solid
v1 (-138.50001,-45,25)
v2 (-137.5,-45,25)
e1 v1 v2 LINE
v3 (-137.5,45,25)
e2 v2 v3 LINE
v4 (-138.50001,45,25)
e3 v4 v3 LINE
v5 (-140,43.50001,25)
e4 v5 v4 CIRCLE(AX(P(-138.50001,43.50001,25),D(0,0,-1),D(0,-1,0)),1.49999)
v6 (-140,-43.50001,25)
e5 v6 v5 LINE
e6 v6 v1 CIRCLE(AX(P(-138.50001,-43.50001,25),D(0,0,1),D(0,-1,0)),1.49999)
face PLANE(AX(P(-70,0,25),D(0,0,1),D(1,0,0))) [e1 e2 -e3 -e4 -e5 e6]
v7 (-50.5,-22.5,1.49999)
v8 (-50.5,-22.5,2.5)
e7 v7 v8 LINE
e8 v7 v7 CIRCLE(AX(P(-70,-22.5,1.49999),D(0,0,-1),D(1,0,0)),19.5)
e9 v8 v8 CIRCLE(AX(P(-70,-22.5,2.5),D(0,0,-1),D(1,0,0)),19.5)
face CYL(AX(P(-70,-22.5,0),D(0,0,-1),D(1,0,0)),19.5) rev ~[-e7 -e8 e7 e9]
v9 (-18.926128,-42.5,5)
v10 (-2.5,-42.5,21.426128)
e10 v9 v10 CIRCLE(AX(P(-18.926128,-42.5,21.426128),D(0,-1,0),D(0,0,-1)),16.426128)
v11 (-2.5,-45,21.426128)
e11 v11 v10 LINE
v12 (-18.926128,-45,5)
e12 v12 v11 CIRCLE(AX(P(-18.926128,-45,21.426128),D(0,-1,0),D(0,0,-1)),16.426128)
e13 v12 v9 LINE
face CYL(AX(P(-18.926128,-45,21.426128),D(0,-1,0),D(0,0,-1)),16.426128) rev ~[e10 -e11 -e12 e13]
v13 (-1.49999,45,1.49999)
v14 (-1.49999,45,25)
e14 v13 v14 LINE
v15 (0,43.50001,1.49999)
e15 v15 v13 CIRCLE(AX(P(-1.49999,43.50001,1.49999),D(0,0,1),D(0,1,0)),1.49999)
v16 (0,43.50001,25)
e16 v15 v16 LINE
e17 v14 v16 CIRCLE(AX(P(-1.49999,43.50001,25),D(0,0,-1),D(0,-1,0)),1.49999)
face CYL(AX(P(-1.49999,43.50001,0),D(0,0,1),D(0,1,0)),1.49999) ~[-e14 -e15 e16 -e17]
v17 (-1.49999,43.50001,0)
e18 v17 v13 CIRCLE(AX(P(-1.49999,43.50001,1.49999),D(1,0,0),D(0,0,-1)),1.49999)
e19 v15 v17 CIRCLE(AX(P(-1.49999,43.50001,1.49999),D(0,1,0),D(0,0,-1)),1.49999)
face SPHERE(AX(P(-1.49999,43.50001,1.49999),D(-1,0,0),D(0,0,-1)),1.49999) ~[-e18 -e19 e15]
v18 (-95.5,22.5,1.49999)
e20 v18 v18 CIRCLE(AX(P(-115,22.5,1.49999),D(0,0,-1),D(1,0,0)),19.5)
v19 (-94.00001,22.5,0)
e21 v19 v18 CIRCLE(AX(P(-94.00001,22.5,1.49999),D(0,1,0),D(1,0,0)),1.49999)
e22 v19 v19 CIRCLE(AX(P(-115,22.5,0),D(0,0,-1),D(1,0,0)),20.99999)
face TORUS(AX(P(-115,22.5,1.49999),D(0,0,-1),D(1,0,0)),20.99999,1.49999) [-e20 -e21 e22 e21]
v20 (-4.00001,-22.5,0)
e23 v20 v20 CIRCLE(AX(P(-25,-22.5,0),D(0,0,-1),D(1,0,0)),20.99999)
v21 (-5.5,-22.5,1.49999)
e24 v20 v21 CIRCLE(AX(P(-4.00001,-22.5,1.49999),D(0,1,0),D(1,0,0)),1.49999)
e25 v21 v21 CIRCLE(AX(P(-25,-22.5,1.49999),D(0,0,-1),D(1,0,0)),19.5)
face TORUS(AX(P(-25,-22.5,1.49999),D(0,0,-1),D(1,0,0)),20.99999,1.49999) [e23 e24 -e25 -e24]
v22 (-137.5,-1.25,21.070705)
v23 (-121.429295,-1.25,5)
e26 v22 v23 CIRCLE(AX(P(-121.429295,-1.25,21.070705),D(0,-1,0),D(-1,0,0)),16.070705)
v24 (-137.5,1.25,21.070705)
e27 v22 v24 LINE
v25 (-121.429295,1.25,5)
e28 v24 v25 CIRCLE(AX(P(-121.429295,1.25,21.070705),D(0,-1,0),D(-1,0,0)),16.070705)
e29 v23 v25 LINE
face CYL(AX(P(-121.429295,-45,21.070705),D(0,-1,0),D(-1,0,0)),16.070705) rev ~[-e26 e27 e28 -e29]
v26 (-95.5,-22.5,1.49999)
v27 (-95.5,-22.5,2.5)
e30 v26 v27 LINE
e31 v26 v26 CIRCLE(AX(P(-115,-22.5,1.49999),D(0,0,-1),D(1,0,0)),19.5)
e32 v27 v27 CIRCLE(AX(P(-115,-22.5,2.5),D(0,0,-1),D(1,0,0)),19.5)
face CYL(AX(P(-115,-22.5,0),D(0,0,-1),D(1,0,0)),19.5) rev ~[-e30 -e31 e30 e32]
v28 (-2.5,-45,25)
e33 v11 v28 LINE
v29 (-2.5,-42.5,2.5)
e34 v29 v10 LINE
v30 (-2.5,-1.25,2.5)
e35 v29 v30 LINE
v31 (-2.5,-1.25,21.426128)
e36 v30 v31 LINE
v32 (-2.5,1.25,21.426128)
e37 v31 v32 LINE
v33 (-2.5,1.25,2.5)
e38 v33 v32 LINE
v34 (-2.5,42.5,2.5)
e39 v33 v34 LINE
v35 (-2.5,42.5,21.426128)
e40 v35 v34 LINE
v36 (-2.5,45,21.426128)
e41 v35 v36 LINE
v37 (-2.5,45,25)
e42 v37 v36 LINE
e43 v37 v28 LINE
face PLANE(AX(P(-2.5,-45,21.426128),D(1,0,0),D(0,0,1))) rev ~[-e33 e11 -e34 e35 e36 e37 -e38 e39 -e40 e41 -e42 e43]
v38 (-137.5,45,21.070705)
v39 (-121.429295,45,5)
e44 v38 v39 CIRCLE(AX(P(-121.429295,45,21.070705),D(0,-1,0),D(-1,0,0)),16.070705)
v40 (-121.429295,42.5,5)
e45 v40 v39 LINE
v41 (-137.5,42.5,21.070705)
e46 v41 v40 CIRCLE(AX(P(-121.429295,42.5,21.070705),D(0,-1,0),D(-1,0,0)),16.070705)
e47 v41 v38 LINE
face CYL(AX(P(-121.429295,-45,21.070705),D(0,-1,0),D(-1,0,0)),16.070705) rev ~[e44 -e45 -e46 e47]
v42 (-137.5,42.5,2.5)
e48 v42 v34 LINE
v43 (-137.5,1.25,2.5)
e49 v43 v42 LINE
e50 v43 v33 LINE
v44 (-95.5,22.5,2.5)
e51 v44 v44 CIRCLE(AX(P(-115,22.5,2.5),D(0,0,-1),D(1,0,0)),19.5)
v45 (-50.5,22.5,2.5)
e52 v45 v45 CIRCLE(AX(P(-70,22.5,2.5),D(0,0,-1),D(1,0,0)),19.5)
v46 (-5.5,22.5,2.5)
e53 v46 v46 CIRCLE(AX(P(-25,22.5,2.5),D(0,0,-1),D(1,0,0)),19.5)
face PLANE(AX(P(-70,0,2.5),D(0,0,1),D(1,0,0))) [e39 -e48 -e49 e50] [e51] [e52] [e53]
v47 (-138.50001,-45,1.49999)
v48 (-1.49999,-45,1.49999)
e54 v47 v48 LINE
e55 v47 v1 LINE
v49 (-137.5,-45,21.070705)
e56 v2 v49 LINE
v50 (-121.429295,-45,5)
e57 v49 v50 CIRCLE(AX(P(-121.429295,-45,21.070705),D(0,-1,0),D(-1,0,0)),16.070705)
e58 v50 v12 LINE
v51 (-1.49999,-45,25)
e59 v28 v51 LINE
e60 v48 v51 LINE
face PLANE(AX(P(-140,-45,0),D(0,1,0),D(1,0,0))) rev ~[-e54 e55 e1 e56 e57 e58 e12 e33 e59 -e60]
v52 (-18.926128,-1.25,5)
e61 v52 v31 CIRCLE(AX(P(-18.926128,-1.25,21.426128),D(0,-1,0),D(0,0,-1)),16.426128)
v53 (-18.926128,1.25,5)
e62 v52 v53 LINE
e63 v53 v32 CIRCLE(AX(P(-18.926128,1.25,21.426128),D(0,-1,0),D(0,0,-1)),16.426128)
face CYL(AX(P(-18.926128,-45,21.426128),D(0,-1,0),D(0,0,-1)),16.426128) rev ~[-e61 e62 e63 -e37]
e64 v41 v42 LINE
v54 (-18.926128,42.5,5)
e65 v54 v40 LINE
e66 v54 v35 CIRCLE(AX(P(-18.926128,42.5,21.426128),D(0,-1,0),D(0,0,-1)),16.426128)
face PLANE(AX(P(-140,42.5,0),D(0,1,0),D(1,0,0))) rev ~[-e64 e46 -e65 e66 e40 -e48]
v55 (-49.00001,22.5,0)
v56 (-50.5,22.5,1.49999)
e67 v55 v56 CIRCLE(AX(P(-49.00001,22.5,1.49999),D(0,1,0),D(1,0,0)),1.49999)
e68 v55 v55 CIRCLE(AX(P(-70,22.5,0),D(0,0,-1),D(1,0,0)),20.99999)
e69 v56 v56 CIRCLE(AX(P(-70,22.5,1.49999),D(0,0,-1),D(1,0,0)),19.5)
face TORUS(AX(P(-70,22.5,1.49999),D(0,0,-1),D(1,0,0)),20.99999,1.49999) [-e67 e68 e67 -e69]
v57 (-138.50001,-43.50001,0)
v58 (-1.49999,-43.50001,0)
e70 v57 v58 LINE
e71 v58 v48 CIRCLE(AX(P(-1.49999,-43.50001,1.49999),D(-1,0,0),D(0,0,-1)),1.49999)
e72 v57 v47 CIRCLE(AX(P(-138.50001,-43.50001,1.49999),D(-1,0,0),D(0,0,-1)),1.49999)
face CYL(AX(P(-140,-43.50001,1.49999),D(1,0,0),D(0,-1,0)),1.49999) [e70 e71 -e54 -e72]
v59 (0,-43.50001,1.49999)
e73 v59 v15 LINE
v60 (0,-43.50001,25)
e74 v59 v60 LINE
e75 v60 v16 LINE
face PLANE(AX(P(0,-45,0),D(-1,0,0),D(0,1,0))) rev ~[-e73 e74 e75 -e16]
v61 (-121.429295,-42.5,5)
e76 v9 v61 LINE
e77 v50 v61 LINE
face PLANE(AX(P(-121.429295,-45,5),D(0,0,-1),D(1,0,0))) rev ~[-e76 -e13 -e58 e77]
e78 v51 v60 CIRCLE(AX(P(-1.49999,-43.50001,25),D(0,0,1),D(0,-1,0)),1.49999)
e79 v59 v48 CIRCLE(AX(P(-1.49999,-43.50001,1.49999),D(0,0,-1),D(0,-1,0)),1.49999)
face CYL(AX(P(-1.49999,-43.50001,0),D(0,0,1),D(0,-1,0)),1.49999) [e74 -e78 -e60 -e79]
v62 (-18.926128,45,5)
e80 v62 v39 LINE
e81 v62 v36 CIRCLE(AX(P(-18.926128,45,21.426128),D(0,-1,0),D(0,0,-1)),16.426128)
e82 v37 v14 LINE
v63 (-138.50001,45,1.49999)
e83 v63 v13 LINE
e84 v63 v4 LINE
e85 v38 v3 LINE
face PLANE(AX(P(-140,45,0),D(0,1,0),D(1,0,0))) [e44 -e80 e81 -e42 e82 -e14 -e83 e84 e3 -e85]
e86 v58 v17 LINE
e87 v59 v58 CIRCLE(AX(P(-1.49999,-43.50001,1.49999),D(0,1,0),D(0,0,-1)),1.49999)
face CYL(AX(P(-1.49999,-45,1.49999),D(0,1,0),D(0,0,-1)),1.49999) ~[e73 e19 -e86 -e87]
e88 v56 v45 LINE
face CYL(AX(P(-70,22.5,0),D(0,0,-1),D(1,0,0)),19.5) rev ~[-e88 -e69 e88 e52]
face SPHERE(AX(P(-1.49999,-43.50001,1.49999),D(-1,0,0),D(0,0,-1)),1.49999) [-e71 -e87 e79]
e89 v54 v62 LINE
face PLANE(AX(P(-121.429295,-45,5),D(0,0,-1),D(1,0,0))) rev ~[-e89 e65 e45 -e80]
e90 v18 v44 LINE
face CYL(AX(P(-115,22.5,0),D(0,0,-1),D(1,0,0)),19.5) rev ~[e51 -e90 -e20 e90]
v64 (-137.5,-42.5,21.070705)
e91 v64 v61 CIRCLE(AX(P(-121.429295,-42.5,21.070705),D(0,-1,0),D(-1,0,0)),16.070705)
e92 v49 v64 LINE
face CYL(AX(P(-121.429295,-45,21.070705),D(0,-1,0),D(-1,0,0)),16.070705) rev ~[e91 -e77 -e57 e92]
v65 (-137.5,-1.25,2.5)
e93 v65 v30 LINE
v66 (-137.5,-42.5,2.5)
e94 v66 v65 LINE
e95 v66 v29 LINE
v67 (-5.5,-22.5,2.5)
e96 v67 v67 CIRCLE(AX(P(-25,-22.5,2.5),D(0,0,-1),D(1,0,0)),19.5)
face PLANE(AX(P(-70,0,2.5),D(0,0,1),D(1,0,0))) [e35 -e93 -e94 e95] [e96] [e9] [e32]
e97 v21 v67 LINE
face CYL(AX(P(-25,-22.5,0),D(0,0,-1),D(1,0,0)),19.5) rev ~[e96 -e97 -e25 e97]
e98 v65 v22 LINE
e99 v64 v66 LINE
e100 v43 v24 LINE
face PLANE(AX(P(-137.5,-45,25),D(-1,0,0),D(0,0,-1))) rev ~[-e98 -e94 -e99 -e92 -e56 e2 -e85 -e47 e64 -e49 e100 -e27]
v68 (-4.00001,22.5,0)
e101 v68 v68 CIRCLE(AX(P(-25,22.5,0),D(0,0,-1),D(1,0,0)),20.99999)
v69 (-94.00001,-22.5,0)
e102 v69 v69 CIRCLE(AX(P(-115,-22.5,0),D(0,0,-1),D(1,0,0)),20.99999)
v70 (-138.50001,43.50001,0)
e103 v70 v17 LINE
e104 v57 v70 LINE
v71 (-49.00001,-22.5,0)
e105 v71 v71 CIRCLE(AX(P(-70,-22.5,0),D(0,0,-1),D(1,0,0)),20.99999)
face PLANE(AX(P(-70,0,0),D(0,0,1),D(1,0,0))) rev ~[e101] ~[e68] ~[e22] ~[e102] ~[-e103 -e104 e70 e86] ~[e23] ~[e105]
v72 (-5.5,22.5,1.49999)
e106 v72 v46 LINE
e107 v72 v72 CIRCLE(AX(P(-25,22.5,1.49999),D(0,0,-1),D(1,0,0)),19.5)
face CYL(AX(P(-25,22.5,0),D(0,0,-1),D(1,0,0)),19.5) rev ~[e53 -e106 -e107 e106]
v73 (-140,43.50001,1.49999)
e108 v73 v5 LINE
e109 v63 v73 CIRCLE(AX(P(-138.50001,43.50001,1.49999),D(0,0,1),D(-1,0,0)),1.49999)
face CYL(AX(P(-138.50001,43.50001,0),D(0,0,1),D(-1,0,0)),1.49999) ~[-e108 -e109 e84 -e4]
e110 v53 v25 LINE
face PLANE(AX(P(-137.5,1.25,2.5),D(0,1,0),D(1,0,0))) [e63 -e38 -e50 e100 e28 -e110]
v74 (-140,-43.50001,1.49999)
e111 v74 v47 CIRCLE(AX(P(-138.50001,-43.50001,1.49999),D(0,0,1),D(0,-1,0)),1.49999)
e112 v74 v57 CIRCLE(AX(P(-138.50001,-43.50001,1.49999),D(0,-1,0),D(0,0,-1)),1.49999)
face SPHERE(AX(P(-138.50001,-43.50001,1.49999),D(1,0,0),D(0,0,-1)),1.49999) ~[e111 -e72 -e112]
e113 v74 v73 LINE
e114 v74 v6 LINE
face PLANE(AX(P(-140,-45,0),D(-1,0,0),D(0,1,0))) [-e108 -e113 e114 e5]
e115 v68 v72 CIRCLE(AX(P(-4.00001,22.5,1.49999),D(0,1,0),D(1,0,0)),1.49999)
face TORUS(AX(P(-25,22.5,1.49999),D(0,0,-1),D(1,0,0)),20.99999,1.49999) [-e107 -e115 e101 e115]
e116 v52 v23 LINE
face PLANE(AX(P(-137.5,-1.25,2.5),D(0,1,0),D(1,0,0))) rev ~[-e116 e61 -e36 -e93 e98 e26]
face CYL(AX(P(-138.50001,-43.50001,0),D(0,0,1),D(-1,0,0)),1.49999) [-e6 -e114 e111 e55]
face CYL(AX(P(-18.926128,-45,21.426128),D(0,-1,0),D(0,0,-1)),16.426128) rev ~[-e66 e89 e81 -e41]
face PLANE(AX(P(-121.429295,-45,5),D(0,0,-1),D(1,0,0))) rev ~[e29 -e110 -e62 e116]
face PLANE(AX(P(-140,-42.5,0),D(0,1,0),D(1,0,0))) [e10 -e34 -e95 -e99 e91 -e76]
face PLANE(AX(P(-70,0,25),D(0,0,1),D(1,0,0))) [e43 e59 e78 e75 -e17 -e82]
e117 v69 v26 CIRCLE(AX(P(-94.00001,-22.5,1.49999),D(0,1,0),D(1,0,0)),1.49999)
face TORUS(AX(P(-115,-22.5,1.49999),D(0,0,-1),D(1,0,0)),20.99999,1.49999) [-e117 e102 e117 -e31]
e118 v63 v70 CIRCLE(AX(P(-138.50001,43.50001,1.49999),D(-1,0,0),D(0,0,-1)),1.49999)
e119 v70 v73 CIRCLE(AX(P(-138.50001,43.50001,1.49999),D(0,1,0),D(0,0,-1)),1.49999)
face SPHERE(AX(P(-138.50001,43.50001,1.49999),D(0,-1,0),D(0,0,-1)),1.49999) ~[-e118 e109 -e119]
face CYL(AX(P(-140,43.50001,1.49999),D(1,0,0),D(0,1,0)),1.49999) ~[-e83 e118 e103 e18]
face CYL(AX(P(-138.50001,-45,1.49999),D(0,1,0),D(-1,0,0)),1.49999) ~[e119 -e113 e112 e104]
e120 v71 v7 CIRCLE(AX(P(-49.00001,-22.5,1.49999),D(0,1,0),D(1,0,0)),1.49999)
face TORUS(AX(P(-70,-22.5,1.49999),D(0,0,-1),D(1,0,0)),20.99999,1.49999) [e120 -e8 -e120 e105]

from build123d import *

# Parameters (mm, degrees)
F0_W     = 140
F0_H     = 90
F1_DEPTH = 25
F2_T     = -2.5
F4_W     = 140
F4_H     = 90
F4_R     = 19.5
F5_DEPTH = 25
F6_R     = 1.49999
F7_W     = 135
F7_H     = 2.5
F8_DEPTH = 22.5
F9_DEPTH = 90.001


# Not quite as in the source:
# - a fillet or chamfer is up to 0.001 mm smaller than in the source, because OpenCascade refuses the exact size


with BuildPart() as f1:
    # F0 (on Top) → F1 (new body)
    with BuildSketch(Plane.XY):
        with Locations((-70, 0)):
            Rectangle(F0_W, F0_H)
    extrude(amount=F1_DEPTH)

    # F2
    f2_openings = [f1.faces().sort_by_distance(p)[0] for p in [
        (-70, 0, 25),
    ]]
    offset(amount=F2_T, openings=f2_openings)

    # F4 (on face) → F5 (intersect)
    with BuildSketch(Plane(origin=(0, 0, 0), x_dir=(1, 0, 0), z_dir=(0, 0, -1))):
        with Locations((-70, 0)):
            Rectangle(F4_W, F4_H)
        with Locations((-115, -22.5)):
            Circle(F4_R, mode=Mode.SUBTRACT)
        with Locations((-70, -22.5)):
            Circle(F4_R, mode=Mode.SUBTRACT)
        with Locations((-25, -22.5)):
            Circle(F4_R, mode=Mode.SUBTRACT)
        with Locations((-115, 22.5)):
            Circle(F4_R, mode=Mode.SUBTRACT)
        with Locations((-70, 22.5)):
            Circle(F4_R, mode=Mode.SUBTRACT)
        with Locations((-25, 22.5)):
            Circle(F4_R, mode=Mode.SUBTRACT)
    extrude(amount=-F5_DEPTH, mode=Mode.INTERSECT)

    # F6 (radius 1.5 in the source; OpenCascade refuses exactly that, so slightly less here)
    f6_edges = [f1.edges().sort_by_distance(p)[0] for p in [
        (-70, -45, 0),
        (-140, 0, 0),
        (-70, 45, 0),
        (0, 0, 0),
        (-134.5, 22.5, 0),
        (-89.5, 22.5, 0),
        (-44.5, 22.5, 0),
        (-134.5, -22.5, 0),
        (-89.5, -22.5, 0),
        (-44.5, -22.5, 0),
        (-140, 45, 12.5),
        (-140, -45, 12.5),
        (0, -45, 12.5),
        (0, 45, 12.5),
    ]]
    fillet(f6_edges, radius=F6_R)

    # F7 (on face) → F8 (join)
    with BuildSketch(Plane.XY.offset(2.5)):
        with Locations((-70, 0)):
            Rectangle(F7_W, F7_H)
    extrude(amount=F8_DEPTH)

    # F3 (on face) → F9 (cut, through all)
    with BuildSketch(Plane.XZ.offset(45)):
        with BuildLine():
            Line((-2.5, 25), (-137.5, 25))
            Line((-137.5, 25), (-137.5, 21.0707051933))
            ThreePointArc((-137.5, 21.0707051933), (-132.7929994273, 9.7070005727), (-121.4292948067, 5))
            Line((-121.4292948067, 5), (-18.9261284359, 5))
            ThreePointArc((-18.9261284359, 5), (-7.3111016302, 9.8111016302), (-2.5, 21.4261284359))
            Line((-2.5, 21.4261284359), (-2.5, 25))
        make_face()
    extrude(amount=-F9_DEPTH, mode=Mode.SUBTRACT)


solid = f1.part
